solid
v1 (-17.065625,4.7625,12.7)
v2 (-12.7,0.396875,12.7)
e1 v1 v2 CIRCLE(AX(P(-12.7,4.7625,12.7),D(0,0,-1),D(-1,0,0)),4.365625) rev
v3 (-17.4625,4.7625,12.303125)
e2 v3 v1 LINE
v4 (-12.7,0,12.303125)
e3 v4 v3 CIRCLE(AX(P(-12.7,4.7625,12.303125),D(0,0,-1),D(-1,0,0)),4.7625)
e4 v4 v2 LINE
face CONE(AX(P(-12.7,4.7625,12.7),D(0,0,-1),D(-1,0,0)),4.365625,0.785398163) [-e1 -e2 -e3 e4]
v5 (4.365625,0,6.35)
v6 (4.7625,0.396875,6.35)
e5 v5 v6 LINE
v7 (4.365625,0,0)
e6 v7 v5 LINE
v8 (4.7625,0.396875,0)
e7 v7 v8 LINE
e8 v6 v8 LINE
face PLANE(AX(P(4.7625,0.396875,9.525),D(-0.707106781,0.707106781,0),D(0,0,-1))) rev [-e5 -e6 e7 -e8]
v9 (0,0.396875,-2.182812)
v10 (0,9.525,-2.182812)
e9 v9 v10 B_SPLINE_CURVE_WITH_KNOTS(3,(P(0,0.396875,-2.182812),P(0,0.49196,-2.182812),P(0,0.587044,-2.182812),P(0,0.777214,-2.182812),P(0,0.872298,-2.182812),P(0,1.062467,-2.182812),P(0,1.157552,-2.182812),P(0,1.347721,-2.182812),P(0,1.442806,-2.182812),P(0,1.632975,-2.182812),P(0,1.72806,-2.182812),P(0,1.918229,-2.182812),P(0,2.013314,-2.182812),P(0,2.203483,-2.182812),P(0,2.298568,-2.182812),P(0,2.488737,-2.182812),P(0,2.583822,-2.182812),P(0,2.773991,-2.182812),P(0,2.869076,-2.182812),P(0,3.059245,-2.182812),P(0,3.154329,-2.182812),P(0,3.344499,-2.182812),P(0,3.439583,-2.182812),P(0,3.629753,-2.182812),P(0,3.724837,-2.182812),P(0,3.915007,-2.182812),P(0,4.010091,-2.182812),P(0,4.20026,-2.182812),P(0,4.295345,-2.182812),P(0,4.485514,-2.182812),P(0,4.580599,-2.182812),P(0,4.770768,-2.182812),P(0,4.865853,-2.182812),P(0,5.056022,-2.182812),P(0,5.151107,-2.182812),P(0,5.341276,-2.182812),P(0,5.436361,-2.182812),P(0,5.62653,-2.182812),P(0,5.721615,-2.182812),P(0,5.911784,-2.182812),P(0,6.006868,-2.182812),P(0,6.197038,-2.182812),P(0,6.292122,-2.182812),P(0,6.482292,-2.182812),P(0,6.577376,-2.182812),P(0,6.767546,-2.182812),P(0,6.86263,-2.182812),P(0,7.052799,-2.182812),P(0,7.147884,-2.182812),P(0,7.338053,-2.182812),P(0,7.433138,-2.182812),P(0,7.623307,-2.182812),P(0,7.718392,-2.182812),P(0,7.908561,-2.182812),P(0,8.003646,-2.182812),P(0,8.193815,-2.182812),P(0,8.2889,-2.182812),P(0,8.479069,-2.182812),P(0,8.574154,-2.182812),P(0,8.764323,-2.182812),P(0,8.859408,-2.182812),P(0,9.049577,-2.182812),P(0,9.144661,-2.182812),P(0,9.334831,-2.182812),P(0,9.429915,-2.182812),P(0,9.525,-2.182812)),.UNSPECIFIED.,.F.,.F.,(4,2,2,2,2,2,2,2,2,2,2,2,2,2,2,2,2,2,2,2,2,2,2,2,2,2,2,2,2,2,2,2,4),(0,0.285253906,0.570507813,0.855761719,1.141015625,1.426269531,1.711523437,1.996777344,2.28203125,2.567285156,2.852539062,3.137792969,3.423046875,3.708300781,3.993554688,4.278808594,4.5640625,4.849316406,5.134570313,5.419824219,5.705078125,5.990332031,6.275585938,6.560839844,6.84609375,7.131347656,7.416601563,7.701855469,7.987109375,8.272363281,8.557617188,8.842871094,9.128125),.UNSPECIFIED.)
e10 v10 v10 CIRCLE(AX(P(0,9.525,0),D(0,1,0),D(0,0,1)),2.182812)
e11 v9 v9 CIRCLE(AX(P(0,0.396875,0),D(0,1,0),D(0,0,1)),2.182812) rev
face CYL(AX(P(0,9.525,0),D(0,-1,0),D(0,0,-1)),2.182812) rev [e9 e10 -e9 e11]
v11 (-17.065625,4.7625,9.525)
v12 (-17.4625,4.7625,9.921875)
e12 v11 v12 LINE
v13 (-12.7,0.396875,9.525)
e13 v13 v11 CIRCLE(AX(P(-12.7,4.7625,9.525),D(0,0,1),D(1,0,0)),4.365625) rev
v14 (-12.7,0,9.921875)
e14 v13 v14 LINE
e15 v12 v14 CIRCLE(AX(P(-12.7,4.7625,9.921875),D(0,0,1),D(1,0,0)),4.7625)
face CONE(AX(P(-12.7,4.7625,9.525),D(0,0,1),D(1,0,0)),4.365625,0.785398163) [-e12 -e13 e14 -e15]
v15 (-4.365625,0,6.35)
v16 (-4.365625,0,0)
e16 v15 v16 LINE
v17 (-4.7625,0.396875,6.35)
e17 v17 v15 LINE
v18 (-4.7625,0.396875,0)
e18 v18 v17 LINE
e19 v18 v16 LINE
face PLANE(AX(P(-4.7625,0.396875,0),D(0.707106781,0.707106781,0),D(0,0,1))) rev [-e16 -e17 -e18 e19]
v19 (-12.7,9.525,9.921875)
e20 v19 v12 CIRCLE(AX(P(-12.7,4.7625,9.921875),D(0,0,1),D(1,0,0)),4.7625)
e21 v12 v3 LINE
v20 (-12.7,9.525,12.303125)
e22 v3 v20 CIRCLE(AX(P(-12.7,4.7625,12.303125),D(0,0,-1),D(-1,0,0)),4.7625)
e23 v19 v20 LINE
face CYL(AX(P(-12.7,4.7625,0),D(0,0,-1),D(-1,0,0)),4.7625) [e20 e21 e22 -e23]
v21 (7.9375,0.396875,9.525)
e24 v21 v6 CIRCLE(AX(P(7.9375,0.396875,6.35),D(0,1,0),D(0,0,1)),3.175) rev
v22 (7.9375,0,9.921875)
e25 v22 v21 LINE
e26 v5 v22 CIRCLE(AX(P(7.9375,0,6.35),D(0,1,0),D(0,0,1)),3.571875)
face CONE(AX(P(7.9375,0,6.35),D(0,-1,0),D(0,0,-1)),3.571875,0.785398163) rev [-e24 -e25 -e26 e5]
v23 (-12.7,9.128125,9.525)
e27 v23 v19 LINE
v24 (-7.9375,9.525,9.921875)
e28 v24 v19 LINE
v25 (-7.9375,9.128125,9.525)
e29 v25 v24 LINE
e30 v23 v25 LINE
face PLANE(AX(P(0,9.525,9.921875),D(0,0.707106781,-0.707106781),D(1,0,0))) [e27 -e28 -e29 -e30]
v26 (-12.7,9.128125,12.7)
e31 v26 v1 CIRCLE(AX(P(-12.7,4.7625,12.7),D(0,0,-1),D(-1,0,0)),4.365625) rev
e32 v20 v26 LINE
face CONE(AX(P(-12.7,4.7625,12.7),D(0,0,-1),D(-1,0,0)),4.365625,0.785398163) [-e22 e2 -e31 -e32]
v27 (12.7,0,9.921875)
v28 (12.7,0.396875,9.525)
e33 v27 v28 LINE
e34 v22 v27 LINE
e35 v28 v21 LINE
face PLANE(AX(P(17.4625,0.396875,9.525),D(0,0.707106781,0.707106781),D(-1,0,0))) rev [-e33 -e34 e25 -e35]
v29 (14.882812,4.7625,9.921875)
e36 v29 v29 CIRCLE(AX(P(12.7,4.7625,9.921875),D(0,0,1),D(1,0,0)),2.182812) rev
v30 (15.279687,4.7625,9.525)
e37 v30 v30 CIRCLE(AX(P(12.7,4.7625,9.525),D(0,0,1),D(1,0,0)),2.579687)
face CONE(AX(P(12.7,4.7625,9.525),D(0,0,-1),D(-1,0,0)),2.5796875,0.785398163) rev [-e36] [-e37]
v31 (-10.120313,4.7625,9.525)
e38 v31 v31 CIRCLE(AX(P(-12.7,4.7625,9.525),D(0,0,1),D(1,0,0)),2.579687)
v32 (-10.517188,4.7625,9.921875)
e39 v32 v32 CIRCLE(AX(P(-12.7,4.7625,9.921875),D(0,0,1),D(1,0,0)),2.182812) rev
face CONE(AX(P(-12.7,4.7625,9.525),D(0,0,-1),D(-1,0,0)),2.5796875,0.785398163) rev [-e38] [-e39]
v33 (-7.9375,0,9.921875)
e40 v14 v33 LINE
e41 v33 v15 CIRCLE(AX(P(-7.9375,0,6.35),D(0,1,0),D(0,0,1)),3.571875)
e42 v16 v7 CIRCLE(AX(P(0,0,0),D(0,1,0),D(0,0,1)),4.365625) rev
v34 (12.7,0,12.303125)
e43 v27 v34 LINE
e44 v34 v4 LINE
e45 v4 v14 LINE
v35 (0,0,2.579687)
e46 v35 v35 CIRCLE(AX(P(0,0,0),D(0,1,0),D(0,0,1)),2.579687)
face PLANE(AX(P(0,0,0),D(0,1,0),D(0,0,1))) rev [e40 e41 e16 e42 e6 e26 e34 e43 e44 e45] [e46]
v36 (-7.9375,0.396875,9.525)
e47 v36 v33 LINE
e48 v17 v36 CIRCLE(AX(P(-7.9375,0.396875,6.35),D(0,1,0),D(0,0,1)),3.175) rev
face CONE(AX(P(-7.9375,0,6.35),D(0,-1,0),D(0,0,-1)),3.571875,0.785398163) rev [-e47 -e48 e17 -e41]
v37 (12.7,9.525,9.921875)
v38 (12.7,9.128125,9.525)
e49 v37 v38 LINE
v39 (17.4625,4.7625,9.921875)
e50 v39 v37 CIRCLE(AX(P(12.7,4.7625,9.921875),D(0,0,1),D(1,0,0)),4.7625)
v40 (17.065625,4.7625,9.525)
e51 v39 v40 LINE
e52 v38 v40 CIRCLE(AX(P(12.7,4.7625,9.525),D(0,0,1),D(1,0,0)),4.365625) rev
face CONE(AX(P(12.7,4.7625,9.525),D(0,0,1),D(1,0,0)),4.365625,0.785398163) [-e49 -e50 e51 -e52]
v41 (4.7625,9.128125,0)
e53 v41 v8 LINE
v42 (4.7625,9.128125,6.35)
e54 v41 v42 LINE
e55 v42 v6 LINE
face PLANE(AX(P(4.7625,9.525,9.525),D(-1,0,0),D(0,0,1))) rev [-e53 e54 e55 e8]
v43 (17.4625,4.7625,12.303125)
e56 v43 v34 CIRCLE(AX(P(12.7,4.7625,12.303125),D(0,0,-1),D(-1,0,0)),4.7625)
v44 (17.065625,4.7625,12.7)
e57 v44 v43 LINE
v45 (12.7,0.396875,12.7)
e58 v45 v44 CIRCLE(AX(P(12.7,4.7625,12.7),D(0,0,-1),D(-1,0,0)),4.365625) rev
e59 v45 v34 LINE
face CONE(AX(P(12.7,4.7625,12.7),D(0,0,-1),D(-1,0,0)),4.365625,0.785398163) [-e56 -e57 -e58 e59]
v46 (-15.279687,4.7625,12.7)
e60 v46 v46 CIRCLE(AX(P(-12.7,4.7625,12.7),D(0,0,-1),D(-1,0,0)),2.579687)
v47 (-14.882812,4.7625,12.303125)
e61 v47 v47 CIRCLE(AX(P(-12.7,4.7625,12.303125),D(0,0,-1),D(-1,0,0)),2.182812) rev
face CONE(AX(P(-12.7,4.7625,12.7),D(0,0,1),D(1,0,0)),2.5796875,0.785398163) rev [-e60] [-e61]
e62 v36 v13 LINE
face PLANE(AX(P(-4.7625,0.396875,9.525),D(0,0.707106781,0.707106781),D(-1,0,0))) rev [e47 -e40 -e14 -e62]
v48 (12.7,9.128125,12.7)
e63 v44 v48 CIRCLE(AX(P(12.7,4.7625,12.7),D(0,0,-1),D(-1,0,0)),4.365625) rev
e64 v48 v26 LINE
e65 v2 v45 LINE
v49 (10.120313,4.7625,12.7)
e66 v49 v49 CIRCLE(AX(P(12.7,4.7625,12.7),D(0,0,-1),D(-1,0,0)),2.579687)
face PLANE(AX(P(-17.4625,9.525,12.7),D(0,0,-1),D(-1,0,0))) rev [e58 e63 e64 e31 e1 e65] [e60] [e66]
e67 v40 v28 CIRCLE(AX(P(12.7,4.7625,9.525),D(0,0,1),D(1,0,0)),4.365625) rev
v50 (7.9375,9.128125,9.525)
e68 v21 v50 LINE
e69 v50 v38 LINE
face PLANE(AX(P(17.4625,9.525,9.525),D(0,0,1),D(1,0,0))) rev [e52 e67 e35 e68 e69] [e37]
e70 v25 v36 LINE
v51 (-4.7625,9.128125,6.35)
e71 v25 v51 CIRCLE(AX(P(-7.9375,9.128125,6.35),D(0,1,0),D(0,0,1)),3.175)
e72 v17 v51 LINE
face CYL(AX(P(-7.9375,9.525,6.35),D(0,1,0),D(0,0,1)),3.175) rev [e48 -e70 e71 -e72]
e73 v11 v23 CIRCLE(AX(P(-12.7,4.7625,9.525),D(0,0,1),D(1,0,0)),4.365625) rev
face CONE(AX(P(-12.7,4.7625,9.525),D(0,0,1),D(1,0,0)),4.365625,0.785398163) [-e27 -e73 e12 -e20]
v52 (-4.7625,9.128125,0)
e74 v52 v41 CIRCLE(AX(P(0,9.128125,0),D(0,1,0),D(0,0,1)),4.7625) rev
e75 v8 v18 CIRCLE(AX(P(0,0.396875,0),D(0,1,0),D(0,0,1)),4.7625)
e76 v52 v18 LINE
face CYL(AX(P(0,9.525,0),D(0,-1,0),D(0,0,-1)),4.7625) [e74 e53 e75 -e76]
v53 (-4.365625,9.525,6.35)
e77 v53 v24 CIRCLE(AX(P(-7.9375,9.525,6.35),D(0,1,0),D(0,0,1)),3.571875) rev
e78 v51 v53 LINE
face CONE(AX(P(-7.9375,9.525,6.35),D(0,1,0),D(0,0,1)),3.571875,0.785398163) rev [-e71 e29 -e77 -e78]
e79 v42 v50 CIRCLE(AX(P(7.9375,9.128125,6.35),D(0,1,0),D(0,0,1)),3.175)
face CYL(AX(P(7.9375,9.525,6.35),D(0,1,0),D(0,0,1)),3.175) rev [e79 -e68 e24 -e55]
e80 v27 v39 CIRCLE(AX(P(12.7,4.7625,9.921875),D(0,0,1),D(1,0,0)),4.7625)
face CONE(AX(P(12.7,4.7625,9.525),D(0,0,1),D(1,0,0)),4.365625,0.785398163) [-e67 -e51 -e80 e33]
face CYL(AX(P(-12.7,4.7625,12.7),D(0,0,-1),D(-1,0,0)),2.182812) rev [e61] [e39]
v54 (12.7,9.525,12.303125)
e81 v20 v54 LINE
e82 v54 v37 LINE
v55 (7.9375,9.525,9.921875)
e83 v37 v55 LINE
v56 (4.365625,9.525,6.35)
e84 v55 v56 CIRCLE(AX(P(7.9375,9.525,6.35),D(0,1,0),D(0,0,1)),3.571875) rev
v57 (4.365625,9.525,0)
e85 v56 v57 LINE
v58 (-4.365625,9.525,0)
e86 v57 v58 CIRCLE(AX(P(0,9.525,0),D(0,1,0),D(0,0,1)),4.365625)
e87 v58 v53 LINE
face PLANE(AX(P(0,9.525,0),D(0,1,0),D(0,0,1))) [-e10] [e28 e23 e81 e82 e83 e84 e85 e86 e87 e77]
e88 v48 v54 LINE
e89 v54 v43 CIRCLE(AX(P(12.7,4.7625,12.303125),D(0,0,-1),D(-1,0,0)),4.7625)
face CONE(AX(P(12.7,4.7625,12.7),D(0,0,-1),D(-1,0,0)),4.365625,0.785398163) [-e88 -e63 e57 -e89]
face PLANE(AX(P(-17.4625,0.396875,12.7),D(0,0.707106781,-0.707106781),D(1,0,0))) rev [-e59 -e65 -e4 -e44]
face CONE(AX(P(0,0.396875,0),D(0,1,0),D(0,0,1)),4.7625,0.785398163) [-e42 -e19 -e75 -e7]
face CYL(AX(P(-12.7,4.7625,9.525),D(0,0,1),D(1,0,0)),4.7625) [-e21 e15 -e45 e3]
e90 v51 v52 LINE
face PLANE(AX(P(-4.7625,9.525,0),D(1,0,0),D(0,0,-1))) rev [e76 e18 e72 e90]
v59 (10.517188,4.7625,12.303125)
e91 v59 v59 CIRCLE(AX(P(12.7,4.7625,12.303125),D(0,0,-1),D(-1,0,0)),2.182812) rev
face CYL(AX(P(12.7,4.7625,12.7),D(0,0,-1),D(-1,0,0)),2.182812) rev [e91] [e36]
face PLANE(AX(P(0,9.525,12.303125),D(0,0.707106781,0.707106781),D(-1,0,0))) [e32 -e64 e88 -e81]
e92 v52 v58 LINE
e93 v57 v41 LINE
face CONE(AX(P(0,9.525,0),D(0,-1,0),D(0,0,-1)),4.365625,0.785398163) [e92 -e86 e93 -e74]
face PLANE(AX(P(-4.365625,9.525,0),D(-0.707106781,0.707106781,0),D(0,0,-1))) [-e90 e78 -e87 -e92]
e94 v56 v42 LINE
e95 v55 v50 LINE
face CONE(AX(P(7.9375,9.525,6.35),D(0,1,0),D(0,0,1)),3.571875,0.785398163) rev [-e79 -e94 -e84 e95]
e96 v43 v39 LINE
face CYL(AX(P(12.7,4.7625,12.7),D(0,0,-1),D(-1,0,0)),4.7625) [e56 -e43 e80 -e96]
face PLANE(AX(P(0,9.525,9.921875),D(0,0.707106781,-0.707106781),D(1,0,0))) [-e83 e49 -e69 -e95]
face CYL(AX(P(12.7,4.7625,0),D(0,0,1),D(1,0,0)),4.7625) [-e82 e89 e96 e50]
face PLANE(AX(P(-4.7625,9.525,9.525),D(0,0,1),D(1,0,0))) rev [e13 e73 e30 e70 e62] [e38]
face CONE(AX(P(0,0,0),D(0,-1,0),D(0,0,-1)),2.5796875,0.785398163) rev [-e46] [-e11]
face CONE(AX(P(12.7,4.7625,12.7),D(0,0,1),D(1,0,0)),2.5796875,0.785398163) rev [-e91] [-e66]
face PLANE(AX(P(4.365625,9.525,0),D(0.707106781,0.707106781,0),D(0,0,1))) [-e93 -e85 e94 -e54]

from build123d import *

# Parameters (mm, degrees)
SKETCH1_R               = 2.1828125
BOSS_EXTRUDE1_DEPTH     = 9.525
CUT_EXTRUDE1_DEPTH      = 25.490757185
CUT_EXTRUDE1_DEPTH_BACK = 25.490757185
SKETCH2_R               = 2.1828125
FILLET1_R               = 4.7625
FILLET2_R               = 3.175
CHAMFER1_SIZE           = 0.396875


with BuildPart() as part:
    # Sketch1 → Boss-Extrude1 (new body)
    with BuildSketch(Plane(origin=(0, 0, 0), x_dir=(1, 0, 0), z_dir=(0, 1, 0))):
        with BuildLine():
            Line((-4.7625, 0), (-4.7625, -9.525))
            Line((-4.7625, -9.525), (-17.4625, -9.525))
            Line((-17.4625, -9.525), (-17.4625, -12.7))
            Line((-17.4625, -12.7), (17.4625, -12.7))
            Line((17.4625, -12.7), (17.4625, -9.525))
            Line((17.4625, -9.525), (4.7625, -9.525))
            Line((4.7625, -9.525), (4.7625, 0))
            ThreePointArc((4.7625, 0), (0, 4.7625), (-4.7625, 0))
        make_face()
        with Locations(Location((0, 0, 0), (0, 0, 90))):
            Circle(SKETCH1_R, mode=Mode.SUBTRACT)
    extrude(amount=BOSS_EXTRUDE1_DEPTH)

    # Sketch2 → Cut-Extrude1 (cut, two sides: drawn at the far end of the back side and taken through both)
    with BuildSketch(Plane(origin=(0, 0, 9.525), x_dir=(-1, 0, 0), z_dir=(0, 0, -1)).offset(-CUT_EXTRUDE1_DEPTH_BACK)):
        with Locations((-12.7, 4.7625)):
            Circle(SKETCH2_R)
        with Locations((12.7, 4.7625)):
            Circle(SKETCH2_R)
    extrude(amount=CUT_EXTRUDE1_DEPTH + CUT_EXTRUDE1_DEPTH_BACK, mode=Mode.SUBTRACT)

    # Fillet1
    fillet1_edges = [part.edges().sort_by_distance(p)[0] for p in [
        (17.4625, 9.525, 11.1125),
        (17.4625, 0, 11.1125),
        (-17.4625, 9.525, 11.1125),
        (-17.4625, 0, 11.1125),
    ]]
    fillet(fillet1_edges, radius=FILLET1_R - 0.0001)  # a hair under: the kernel refuses the full size

    # Fillet2
    fillet2_edges = [part.edges().sort_by_distance(p)[0] for p in [
        (4.7625, 4.7625, 9.525),
        (-4.7625, 4.7625, 9.525),
    ]]
    fillet(fillet2_edges, radius=FILLET2_R)

    # Chamfer1
    chamfer1_edges = [part.edges().sort_by_distance(p)[0] for p in [
        (-4.7625, 0, 3.175),
        (0, 0, -4.7625),
        (0, 0, 2.1828125),
        (14.8828125, 4.7625, 12.7),
        (14.8828125, 4.7625, 9.525),
        (-10.5171875, 4.7625, 12.7),
        (-10.5171875, 4.7625, 9.525),
        (0, 9.525, 12.7),
        (10.3188, 9.525, 9.525),
        (10.3188, 0, 9.525),
        (16.067625335, 1.394874665, 9.525),
        (16.067625335, 8.130125335, 9.525),
        (0, 0, 12.7),
        (-16.067625335, 1.394874665, 12.7),
        (-16.067625335, 8.130125335, 12.7),
        (16.067625335, 1.394874665, 12.7),
        (16.067625335, 8.130125335, 12.7),
        (-16.067625335, 1.394874665, 9.525),
        (-16.067625335, 8.130125335, 9.525),
        (0, 9.525, -4.7625),
        (4.7625, 0, 3.175),
        (4.7625, 9.525, 3.175),
        (-10.3188, 9.525, 9.525),
        (-10.3188, 0, 9.525),
        (5.69243597, 0, 8.59506403),
        (5.69243597, 9.525, 8.59506403),
        (-5.69243597, 0, 8.59506403),
        (-5.69243597, 9.525, 8.59506403),
        (-4.7625, 9.525, 3.175),
    ]]
    chamfer(chamfer1_edges, length=CHAMFER1_SIZE)


solid = part.part
